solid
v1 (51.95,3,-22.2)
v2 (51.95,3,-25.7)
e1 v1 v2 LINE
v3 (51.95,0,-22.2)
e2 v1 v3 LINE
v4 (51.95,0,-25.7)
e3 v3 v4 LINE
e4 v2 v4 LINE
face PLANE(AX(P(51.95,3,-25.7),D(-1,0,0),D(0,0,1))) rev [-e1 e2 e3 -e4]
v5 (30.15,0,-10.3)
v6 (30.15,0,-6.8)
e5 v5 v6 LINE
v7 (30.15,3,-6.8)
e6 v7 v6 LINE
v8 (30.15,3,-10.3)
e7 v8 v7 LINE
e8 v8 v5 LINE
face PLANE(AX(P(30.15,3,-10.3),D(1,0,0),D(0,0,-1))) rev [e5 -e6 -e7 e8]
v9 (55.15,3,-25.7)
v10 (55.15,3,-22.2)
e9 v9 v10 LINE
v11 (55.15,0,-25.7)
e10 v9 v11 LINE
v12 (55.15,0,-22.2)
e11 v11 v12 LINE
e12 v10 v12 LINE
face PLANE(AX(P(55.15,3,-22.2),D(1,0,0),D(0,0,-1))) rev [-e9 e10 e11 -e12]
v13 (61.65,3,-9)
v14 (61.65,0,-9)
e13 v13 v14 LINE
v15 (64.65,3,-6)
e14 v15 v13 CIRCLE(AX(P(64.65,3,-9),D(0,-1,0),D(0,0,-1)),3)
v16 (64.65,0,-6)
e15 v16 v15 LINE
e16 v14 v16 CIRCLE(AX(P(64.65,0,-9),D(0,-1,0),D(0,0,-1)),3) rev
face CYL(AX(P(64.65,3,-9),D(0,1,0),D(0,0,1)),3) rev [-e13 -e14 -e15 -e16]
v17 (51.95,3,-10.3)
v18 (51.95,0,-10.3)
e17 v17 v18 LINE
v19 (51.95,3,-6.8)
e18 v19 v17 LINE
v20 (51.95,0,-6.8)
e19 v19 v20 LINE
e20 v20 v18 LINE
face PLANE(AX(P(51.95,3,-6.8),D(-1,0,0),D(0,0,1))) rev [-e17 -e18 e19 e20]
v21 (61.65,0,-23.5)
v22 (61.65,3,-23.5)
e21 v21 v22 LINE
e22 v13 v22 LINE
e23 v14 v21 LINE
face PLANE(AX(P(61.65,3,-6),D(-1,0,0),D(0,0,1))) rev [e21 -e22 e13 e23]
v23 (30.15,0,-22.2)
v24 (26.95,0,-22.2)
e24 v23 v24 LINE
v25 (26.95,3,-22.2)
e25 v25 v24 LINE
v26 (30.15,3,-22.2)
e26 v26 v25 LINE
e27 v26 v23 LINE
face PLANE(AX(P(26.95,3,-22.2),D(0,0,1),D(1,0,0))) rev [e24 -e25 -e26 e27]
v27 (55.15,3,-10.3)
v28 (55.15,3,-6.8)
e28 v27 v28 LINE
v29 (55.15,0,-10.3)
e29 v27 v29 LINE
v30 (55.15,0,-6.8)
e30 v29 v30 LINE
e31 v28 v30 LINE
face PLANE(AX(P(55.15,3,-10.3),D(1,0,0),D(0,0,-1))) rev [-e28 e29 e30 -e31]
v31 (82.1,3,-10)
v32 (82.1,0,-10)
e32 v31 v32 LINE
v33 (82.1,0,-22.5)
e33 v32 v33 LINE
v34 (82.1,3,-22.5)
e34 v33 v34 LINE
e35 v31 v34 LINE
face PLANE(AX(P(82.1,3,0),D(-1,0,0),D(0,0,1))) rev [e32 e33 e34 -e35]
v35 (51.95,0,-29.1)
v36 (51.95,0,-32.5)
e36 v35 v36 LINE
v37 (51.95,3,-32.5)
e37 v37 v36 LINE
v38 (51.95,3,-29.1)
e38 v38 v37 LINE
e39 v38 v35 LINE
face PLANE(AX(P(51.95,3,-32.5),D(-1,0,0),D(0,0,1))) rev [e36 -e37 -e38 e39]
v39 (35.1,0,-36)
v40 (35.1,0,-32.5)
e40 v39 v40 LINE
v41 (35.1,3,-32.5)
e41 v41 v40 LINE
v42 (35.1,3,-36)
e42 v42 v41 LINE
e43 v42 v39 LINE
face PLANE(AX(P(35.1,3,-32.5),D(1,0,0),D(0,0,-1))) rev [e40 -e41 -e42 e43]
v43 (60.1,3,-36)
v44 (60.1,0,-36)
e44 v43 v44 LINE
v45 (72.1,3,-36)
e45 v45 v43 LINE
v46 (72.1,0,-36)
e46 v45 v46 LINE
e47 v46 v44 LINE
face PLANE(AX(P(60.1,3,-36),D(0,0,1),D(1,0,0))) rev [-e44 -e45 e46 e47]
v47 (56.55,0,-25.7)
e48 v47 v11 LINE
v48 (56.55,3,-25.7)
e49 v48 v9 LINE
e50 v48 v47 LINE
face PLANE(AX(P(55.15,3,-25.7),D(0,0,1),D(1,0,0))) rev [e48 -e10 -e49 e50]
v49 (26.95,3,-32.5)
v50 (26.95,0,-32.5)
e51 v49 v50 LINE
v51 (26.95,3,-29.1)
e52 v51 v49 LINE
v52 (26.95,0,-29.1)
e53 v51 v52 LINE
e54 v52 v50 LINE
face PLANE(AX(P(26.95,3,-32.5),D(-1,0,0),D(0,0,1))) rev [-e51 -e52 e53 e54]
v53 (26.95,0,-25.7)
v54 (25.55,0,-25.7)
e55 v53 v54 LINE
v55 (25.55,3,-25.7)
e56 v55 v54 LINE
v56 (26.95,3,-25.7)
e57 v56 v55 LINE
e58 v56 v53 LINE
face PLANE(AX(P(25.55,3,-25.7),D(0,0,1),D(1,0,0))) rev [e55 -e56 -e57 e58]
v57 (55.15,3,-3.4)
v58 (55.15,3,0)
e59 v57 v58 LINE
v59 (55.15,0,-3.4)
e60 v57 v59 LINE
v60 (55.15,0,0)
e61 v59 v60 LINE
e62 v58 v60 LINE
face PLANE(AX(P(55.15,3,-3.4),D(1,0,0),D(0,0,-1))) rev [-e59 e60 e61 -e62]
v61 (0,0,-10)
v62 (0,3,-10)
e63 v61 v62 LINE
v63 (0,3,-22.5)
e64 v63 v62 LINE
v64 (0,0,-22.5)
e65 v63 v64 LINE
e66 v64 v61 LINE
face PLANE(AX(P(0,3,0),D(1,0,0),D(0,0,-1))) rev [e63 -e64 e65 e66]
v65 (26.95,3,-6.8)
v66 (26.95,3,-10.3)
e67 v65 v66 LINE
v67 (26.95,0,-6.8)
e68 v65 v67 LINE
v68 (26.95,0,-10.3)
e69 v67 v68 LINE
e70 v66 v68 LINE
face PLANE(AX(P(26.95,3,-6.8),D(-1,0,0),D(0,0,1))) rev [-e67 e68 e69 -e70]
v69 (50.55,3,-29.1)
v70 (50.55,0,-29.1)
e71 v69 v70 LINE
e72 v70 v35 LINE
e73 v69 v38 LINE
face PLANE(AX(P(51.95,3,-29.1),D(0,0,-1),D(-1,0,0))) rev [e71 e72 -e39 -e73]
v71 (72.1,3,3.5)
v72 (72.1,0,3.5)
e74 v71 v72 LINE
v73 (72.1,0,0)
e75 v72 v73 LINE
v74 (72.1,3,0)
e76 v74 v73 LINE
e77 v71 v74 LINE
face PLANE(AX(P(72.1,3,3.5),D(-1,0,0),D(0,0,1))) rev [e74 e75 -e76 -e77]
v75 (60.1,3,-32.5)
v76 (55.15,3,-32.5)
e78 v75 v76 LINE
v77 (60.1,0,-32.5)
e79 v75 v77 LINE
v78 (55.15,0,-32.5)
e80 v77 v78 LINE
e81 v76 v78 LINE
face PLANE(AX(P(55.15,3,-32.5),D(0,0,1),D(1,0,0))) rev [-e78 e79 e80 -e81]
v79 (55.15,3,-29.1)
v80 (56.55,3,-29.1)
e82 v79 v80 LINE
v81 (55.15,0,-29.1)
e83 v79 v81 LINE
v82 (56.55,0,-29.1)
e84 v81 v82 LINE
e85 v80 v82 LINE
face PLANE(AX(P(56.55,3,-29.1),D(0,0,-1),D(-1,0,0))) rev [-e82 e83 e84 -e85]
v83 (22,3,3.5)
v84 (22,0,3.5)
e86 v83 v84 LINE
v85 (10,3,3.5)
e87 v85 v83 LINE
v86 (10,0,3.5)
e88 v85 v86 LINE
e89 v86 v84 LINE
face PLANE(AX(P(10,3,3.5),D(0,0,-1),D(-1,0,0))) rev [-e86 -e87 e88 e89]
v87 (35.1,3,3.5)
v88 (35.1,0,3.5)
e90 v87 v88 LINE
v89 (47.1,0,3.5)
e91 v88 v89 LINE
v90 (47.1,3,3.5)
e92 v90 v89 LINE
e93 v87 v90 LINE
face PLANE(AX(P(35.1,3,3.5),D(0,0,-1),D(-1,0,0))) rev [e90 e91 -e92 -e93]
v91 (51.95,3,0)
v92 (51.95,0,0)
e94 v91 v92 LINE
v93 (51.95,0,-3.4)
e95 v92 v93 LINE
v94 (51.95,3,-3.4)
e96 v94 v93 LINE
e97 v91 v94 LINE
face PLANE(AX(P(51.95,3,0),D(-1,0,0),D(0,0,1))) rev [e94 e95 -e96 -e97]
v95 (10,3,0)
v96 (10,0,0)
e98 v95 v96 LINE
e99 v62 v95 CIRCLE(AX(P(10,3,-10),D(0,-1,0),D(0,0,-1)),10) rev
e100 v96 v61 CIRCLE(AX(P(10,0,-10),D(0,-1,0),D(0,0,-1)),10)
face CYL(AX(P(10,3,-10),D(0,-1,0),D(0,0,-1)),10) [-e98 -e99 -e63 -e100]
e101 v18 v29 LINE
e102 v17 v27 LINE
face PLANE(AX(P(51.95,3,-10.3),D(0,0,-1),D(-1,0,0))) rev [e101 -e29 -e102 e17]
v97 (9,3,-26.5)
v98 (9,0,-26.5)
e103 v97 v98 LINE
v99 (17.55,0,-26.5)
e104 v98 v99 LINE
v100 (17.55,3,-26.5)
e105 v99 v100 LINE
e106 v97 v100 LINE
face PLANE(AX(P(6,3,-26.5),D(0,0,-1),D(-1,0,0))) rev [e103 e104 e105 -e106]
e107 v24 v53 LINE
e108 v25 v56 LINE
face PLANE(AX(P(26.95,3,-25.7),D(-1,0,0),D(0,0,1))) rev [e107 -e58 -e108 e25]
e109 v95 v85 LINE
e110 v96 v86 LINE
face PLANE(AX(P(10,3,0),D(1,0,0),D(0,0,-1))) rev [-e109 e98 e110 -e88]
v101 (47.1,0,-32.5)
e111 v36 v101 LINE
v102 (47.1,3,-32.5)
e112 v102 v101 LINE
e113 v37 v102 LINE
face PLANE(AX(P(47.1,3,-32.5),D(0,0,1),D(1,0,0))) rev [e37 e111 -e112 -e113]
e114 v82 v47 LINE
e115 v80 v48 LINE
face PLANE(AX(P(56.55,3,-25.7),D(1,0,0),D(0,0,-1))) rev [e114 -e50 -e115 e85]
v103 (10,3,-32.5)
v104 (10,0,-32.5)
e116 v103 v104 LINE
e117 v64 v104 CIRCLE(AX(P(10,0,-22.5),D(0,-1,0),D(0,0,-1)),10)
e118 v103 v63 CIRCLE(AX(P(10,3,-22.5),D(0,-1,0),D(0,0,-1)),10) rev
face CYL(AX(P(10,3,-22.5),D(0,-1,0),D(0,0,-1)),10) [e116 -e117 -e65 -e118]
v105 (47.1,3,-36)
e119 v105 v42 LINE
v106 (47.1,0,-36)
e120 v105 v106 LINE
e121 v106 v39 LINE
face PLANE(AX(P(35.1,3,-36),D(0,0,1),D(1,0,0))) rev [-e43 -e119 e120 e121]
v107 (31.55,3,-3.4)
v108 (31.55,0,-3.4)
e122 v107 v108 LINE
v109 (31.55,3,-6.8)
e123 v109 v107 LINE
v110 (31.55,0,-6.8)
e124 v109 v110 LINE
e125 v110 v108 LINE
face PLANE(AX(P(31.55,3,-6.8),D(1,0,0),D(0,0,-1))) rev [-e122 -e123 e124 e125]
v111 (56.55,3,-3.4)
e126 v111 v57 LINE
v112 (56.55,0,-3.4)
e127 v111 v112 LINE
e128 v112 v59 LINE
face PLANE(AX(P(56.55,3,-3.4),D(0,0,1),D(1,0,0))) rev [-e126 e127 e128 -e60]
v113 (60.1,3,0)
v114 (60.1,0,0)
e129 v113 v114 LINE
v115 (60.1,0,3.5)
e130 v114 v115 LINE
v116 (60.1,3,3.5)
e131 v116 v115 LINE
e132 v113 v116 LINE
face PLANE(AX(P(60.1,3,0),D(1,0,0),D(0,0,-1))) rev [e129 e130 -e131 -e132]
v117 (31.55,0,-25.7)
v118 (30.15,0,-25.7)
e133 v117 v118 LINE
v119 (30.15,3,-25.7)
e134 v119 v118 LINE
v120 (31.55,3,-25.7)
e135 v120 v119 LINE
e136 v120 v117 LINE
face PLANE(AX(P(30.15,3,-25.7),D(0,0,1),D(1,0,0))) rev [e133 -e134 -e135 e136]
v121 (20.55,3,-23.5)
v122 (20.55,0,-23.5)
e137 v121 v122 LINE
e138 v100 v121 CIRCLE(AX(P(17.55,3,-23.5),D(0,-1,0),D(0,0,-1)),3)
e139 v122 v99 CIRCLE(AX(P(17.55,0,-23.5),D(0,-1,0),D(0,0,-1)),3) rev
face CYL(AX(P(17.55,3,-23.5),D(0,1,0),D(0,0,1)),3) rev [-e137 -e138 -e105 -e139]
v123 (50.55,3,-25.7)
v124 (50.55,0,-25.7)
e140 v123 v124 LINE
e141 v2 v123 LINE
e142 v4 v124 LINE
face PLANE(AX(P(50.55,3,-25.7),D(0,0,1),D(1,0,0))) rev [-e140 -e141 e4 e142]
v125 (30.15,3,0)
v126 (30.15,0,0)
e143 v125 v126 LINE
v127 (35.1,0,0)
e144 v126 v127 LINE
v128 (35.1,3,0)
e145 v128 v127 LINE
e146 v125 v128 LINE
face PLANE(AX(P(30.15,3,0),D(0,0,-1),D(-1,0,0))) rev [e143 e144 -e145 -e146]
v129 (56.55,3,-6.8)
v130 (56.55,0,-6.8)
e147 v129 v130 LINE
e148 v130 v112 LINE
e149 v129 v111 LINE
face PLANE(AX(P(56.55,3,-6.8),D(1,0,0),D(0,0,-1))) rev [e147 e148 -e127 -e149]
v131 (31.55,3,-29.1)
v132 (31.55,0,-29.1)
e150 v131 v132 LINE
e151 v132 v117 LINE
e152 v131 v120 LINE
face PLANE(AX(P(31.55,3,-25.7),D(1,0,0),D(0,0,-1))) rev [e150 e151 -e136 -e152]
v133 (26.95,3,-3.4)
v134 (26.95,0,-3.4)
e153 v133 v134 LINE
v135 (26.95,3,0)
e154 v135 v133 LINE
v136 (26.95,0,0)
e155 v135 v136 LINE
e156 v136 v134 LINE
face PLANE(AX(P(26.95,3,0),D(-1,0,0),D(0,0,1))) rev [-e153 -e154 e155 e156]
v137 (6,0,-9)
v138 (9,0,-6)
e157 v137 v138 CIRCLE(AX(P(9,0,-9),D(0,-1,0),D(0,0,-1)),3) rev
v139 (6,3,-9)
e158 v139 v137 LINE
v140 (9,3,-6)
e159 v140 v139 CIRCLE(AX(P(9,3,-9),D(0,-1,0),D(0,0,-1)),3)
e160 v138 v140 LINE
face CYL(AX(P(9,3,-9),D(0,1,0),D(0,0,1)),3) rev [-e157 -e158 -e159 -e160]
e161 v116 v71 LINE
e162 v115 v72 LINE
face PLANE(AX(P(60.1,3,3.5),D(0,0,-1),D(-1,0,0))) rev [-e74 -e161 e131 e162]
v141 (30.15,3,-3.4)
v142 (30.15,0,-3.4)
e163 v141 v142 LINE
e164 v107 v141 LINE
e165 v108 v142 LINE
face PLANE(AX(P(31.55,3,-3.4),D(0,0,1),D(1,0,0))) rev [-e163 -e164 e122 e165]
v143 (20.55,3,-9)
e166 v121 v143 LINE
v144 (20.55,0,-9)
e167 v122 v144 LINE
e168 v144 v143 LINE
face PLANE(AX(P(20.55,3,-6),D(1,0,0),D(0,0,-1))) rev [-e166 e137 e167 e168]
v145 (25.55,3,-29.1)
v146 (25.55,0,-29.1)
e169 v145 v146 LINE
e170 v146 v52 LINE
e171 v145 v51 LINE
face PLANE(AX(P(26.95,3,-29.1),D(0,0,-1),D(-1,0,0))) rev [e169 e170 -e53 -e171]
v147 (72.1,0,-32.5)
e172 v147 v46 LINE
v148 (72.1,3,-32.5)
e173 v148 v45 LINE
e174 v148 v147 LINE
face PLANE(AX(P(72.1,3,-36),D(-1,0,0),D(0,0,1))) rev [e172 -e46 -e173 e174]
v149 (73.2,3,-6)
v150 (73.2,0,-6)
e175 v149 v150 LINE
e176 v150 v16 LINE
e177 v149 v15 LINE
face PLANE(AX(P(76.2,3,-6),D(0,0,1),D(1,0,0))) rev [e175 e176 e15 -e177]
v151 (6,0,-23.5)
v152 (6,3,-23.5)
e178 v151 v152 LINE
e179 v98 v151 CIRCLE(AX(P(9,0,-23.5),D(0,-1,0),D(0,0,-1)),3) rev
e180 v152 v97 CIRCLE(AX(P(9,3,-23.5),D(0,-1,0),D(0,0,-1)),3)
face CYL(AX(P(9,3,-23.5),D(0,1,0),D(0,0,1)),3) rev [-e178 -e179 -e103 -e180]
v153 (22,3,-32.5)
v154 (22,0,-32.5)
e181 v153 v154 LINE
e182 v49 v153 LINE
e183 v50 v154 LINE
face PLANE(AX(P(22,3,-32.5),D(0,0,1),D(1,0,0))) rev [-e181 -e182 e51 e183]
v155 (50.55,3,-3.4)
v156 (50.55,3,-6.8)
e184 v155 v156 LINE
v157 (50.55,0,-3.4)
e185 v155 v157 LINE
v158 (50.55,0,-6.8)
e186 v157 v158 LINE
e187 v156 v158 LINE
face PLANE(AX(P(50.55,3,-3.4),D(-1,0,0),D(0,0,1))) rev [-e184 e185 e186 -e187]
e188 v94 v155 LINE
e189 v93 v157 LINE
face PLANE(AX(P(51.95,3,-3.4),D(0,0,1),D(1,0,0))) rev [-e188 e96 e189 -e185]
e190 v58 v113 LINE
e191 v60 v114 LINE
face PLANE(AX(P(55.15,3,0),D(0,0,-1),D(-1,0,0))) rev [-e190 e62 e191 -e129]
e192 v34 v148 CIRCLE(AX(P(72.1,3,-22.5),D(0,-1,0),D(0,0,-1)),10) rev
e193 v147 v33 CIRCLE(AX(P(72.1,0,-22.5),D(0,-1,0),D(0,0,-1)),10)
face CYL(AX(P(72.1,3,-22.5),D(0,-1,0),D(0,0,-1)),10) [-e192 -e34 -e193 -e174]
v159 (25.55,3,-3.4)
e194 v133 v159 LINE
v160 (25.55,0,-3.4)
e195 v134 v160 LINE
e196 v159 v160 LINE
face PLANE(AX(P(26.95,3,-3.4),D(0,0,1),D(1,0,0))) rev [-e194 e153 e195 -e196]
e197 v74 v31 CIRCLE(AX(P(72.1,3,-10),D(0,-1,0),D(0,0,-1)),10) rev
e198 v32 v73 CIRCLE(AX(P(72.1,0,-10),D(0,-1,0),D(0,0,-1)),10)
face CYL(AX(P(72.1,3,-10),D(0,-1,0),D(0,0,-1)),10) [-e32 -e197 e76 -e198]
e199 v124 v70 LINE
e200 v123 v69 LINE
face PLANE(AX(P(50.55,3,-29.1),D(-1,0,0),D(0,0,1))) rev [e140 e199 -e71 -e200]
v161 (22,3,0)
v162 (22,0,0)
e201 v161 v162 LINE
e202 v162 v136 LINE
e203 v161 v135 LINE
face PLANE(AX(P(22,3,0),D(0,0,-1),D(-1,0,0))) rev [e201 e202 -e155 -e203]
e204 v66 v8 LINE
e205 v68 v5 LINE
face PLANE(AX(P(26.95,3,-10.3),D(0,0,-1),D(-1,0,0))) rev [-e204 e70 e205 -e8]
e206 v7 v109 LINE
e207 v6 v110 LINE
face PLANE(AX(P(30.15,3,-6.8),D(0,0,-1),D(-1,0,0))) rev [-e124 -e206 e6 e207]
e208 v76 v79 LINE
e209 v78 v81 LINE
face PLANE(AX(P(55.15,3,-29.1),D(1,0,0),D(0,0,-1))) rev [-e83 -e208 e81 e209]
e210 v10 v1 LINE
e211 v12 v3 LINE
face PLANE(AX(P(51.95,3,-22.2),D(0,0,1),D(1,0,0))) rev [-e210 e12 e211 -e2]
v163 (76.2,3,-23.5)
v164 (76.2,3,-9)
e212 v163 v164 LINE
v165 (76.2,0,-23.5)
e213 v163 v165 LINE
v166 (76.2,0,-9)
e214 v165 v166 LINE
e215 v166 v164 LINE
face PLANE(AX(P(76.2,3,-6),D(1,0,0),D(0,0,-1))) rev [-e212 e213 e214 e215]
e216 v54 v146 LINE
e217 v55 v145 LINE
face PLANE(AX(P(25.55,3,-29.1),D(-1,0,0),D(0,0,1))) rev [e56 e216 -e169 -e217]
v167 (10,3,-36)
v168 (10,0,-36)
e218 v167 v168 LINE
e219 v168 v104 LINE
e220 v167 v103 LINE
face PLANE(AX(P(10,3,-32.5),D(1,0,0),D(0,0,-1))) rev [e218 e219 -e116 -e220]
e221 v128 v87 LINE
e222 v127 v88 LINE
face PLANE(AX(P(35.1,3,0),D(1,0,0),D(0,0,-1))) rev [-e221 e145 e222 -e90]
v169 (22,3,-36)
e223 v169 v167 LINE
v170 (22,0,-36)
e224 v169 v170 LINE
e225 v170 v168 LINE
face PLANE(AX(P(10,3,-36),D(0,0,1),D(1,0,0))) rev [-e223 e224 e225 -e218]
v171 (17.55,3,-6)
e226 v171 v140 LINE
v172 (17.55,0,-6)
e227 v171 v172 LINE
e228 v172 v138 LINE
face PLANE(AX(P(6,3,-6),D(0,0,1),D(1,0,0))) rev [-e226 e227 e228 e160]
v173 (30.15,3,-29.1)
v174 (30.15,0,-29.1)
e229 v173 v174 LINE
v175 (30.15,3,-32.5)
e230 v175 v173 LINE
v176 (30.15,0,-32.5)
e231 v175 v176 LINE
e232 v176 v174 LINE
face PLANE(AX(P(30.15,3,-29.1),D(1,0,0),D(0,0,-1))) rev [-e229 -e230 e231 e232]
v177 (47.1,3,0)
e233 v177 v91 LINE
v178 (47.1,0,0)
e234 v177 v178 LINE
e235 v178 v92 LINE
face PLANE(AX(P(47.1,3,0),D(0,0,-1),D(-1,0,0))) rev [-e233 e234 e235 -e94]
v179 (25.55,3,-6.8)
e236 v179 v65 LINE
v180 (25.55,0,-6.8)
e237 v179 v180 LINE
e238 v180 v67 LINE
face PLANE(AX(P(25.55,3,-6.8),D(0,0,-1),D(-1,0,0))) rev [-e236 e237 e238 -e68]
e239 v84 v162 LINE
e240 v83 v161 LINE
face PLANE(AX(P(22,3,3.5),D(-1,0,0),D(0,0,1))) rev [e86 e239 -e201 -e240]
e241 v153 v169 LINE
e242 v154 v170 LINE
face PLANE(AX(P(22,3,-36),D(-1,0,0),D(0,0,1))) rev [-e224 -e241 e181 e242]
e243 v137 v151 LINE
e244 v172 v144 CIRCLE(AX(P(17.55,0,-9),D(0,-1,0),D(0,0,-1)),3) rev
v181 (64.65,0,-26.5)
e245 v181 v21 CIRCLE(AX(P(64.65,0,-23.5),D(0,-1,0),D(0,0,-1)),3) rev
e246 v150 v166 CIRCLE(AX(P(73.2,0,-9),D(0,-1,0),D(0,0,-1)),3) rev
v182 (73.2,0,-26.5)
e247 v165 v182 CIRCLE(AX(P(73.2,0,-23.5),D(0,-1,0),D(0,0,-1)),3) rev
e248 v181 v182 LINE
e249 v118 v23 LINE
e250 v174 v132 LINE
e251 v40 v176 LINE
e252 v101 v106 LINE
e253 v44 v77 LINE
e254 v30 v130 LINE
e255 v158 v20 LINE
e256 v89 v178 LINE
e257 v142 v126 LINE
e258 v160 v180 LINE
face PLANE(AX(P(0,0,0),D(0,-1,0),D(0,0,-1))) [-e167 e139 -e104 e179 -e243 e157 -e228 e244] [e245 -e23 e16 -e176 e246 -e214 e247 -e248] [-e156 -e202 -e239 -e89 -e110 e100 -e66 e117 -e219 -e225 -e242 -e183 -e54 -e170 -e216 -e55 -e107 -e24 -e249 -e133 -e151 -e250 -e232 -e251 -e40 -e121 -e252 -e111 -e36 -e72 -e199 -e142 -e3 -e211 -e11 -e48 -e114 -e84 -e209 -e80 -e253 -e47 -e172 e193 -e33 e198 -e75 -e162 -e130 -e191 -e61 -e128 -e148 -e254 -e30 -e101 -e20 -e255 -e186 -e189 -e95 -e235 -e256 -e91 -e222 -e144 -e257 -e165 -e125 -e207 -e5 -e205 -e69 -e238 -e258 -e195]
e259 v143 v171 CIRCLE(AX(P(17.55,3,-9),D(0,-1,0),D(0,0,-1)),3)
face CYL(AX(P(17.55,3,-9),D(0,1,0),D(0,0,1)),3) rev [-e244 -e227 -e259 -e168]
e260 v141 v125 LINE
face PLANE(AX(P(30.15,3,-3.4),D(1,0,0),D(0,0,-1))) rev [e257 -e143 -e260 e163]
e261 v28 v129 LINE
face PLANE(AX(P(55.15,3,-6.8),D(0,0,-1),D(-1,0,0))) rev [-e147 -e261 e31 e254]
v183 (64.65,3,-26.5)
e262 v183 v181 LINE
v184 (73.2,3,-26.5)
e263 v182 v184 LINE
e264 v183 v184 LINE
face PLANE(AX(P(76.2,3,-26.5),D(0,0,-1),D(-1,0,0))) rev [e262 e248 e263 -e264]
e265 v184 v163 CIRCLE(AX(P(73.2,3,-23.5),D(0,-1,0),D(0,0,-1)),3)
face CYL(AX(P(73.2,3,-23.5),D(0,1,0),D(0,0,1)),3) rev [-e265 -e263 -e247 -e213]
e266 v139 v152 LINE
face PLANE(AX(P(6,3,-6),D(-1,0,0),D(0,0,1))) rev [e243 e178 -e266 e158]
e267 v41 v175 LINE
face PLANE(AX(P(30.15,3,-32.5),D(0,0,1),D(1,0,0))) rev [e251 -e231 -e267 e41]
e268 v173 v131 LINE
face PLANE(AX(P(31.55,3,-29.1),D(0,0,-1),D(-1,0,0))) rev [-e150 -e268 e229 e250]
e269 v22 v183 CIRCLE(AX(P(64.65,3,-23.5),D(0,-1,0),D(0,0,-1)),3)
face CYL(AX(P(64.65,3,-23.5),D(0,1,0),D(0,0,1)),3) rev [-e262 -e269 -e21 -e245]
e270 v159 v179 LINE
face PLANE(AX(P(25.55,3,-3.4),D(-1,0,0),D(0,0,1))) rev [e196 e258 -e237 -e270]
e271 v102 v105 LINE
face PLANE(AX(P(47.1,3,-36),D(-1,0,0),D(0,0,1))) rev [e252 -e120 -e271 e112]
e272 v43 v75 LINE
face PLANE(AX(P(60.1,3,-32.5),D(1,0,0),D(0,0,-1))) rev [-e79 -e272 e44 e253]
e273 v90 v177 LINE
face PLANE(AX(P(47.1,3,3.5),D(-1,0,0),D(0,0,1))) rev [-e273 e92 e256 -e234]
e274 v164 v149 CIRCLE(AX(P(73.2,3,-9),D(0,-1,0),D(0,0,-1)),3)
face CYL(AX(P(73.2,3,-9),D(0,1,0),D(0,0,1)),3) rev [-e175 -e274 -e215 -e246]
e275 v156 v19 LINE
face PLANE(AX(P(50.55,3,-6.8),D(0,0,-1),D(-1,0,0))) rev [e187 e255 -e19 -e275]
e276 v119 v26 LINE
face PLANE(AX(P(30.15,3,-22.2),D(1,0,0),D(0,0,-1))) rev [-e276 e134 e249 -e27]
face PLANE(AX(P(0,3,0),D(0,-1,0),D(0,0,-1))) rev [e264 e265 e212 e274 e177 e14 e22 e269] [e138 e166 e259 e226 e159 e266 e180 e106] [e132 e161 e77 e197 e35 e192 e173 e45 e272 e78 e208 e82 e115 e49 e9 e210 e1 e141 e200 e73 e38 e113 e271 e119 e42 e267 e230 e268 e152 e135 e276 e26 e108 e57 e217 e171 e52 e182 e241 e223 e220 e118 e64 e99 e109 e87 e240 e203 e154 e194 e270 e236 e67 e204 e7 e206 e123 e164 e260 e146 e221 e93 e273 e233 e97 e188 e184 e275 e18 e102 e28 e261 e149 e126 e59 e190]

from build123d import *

# Parameters (mm, degrees)
EXTRUDE_1_DEPTH     = 3
FILLET_1_R          = 10
SKETCH_2_W          = 14.55
SKETCH_2_H          = 20.5
CUT_EXTRUDE_1_DEPTH = 90.696209507
FILLET_2_R          = 3


with BuildPart() as part:
    # 草图1 → 凸台-拉伸1 (new body)
    with BuildSketch(Plane(origin=(0, 0, 0), x_dir=(1, 0, 0), z_dir=(0, 1, 0))):
        Polygon((10, 0), (10, -3.5), (22, -3.5), (22, 0), (26.95, 0), (26.95, 3.4), (25.55, 3.4), (25.55, 6.8), (26.95, 6.8), (26.95, 10.3), (30.15, 10.3), (30.15, 6.8), (31.55, 6.8), (31.55, 3.4), (30.15, 3.4), (30.15, 0), (35.1, 0), (35.1, -3.5), (47.1, -3.5), (47.1, 0), (51.95, 0), (51.95, 3.4), (50.55, 3.4), (50.55, 6.8), (51.95, 6.8), (51.95, 10.3), (55.15, 10.3), (55.15, 6.8), (56.55, 6.8), (56.55, 3.4), (55.15, 3.4), (55.15, 0), (60.1, 0), (60.1, -3.5), (72.1, -3.5), (72.1, 0), (82.1, 0), (82.1, 32.5), (72.1, 32.5), (72.1, 36), (60.1, 36), (60.1, 32.5), (55.15, 32.5), (55.15, 29.1), (56.55, 29.1), (56.55, 25.7), (55.15, 25.7), (55.15, 22.2), (51.95, 22.2), (51.95, 25.7), (50.55, 25.7), (50.55, 29.1), (51.95, 29.1), (51.95, 32.5), (47.1, 32.5), (47.1, 36), (35.1, 36), (35.1, 32.5), (30.15, 32.5), (30.15, 29.1), (31.55, 29.1), (31.55, 25.7), (30.15, 25.7), (30.15, 22.2), (26.95, 22.2), (26.95, 25.7), (25.55, 25.7), (25.55, 29.1), (26.95, 29.1), (26.95, 32.5), (22, 32.5), (22, 36), (10, 36), (10, 32.5), (0, 32.5), (0, 0), align=None)
    extrude(amount=EXTRUDE_1_DEPTH)

    # 圆角1
    fillet_1_edges = [part.edges().sort_by_distance(p)[0] for p in [
        (0, 1.5, -32.5),
        (82.1, 1.5, -32.5),
        (82.1, 1.5, 0),
        (0, 1.5, 0),
    ]]
    fillet(fillet_1_edges, radius=FILLET_1_R - 0.0001)  # a hair under: the kernel refuses the full size

    # 草图2 → 切除-拉伸1 (cut, through all)
    with BuildSketch(Plane.XZ):
        with Locations((13.275, -16.25)):
            Rectangle(SKETCH_2_W, SKETCH_2_H)
        with Locations((68.925, -16.25)):
            Rectangle(SKETCH_2_W, SKETCH_2_H)
    extrude(amount=-CUT_EXTRUDE_1_DEPTH, mode=Mode.SUBTRACT)

    # 圆角2
    fillet_2_edges = [part.edges().sort_by_distance(p)[0] for p in [
        (6, 1.5, -26.5),
        (6, 1.5, -6),
        (20.55, 1.5, -6),
        (20.55, 1.5, -26.5),
        (61.65, 1.5, -6),
        (76.2, 1.5, -6),
        (76.2, 1.5, -26.5),
        (61.65, 1.5, -26.5),
    ]]
    fillet(fillet_2_edges, radius=FILLET_2_R)


solid = part.part
